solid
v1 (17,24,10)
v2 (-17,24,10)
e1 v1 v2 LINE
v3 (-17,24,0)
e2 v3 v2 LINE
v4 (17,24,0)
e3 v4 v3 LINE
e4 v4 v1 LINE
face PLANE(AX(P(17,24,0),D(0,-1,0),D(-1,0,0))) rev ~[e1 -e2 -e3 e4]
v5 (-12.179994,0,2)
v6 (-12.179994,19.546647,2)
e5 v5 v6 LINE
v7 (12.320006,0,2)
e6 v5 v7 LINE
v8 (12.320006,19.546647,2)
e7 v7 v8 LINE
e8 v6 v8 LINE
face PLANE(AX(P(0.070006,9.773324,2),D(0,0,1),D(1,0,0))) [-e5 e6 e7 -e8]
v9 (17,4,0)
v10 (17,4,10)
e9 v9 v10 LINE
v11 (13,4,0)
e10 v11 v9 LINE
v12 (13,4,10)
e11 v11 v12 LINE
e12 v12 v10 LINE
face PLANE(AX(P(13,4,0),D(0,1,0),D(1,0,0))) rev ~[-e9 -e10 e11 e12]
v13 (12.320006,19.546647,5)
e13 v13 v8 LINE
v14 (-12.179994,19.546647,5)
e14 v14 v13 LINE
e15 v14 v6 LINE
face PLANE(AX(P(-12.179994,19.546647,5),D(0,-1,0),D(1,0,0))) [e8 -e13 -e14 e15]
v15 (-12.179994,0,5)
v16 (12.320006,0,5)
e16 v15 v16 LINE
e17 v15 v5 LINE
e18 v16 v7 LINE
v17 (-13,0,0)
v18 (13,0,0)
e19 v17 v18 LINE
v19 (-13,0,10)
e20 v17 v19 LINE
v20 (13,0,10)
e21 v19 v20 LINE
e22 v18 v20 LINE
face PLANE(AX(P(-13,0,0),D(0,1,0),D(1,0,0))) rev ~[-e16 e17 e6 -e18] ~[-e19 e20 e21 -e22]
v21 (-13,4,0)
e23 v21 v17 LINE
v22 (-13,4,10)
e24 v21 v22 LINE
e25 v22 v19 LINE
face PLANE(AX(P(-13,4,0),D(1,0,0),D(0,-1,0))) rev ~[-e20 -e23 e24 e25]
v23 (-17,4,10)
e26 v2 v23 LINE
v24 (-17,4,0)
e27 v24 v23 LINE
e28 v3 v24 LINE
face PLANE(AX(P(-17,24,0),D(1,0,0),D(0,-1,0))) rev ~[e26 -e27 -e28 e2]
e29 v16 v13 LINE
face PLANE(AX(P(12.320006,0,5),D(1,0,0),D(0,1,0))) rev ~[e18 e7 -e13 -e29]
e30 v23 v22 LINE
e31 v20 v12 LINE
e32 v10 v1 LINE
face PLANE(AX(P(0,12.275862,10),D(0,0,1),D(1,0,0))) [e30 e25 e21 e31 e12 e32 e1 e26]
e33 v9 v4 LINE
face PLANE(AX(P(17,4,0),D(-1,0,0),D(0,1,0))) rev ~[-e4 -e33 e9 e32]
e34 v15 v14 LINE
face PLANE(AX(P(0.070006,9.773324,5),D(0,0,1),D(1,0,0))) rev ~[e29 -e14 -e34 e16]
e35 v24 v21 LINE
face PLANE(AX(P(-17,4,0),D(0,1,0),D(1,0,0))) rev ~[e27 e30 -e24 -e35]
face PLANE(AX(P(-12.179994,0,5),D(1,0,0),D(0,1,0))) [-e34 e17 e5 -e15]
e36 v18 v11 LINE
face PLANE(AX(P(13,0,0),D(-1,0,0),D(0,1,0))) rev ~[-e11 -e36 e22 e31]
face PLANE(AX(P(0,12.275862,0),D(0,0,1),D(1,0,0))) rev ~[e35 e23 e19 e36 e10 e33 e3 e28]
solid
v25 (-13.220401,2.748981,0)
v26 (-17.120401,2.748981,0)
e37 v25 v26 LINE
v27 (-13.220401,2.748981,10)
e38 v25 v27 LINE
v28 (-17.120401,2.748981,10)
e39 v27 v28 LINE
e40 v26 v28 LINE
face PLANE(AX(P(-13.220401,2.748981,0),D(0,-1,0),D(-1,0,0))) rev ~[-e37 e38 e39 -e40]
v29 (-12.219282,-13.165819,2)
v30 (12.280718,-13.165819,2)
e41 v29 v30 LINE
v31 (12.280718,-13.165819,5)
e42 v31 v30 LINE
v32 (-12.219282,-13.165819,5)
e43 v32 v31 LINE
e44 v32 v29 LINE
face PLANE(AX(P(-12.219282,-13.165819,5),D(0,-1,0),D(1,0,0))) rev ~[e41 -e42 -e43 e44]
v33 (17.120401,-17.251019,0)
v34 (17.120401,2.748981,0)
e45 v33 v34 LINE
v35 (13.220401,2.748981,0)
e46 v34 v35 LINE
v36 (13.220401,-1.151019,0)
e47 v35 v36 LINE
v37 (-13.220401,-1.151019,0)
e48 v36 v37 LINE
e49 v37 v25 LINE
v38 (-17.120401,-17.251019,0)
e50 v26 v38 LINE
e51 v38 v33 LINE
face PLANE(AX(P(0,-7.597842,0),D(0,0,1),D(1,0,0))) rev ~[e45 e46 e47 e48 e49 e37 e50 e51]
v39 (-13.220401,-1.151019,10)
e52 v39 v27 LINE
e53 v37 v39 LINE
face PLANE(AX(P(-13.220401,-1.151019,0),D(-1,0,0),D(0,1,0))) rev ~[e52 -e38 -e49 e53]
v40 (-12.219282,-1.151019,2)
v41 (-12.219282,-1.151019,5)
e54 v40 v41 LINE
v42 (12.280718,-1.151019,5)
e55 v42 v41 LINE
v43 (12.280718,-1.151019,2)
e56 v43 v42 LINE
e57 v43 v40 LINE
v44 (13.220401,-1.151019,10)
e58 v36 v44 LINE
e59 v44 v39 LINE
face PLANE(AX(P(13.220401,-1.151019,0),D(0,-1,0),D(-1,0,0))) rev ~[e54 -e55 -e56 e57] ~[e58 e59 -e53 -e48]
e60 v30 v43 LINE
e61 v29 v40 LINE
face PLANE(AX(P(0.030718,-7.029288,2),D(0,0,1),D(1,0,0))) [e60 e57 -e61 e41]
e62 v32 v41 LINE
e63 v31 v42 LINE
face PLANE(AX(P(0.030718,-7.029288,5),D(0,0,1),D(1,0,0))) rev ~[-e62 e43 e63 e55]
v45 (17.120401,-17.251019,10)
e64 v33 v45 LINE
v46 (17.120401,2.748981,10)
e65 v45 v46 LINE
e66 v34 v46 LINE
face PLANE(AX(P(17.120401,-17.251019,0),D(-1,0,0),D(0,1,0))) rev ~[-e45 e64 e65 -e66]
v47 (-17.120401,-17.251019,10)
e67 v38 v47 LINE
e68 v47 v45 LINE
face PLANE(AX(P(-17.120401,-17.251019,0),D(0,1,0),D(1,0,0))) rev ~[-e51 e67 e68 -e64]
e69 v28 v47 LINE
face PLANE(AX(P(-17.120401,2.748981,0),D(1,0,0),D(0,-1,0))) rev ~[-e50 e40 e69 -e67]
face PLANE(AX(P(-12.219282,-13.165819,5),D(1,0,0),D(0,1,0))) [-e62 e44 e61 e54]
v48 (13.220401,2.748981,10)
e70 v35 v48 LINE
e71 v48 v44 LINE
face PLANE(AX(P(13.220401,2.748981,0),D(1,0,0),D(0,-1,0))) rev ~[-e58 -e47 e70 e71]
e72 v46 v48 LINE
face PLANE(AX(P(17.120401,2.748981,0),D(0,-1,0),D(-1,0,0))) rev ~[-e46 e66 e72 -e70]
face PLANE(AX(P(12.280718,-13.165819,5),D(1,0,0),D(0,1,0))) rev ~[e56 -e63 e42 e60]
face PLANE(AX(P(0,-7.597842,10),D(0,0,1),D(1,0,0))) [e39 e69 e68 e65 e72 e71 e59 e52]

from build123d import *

# Parameters (mm, degrees)
F1_DEPTH = 10
F3_W     = 24.5
F3_H     = 19.5466473553
F4_DEPTH = 3
F5_W     = 24.5
F5_H     = 12.2730633011
F6_DEPTH = 3


with BuildPart() as f1:
    # F0 (on Top) → F1 (new body)
    with BuildSketch(Plane.XY):
        Polygon((-13, 0), (13, 0), (13, 4), (17, 4), (17, 24), (-17, 24), (-17, 4), (-13, 4), align=None)
    extrude(amount=F1_DEPTH)

    # F3 (on offset) → F4 (cut)
    with BuildSketch(Plane.XY.offset(5)):
        with Locations((0.0700059757, 9.7733236776)):
            Rectangle(F3_W, F3_H)
    extrude(amount=-F4_DEPTH, mode=Mode.SUBTRACT)


with BuildPart() as f1b:
    # F0 (on Top) → F1, piece 2 (new body)
    with BuildSketch(Plane.XY):
        Polygon((17.1204014808, 2.7489810166), (13.2204014808, 2.7489810166), (13.2204014808, -1.1510189834), (0, -1.1510189834), (-13.2204014808, -1.1510189834), (-13.2204014808, 2.7489810166), (-17.1204014808, 2.7489810166), (-17.1204014808, -17.2510189834), (17.1204014808, -17.2510189834), align=None)
    extrude(amount=F1_DEPTH)

    # F5 (on offset) → F6 (cut)
    with BuildSketch(Plane.XY.offset(5)):
        with Locations((0.0307181329, -7.0292878081)):
            Rectangle(F5_W, F5_H)
    extrude(amount=-F6_DEPTH, mode=Mode.SUBTRACT)


solid = Compound([f1.part, f1b.part])
